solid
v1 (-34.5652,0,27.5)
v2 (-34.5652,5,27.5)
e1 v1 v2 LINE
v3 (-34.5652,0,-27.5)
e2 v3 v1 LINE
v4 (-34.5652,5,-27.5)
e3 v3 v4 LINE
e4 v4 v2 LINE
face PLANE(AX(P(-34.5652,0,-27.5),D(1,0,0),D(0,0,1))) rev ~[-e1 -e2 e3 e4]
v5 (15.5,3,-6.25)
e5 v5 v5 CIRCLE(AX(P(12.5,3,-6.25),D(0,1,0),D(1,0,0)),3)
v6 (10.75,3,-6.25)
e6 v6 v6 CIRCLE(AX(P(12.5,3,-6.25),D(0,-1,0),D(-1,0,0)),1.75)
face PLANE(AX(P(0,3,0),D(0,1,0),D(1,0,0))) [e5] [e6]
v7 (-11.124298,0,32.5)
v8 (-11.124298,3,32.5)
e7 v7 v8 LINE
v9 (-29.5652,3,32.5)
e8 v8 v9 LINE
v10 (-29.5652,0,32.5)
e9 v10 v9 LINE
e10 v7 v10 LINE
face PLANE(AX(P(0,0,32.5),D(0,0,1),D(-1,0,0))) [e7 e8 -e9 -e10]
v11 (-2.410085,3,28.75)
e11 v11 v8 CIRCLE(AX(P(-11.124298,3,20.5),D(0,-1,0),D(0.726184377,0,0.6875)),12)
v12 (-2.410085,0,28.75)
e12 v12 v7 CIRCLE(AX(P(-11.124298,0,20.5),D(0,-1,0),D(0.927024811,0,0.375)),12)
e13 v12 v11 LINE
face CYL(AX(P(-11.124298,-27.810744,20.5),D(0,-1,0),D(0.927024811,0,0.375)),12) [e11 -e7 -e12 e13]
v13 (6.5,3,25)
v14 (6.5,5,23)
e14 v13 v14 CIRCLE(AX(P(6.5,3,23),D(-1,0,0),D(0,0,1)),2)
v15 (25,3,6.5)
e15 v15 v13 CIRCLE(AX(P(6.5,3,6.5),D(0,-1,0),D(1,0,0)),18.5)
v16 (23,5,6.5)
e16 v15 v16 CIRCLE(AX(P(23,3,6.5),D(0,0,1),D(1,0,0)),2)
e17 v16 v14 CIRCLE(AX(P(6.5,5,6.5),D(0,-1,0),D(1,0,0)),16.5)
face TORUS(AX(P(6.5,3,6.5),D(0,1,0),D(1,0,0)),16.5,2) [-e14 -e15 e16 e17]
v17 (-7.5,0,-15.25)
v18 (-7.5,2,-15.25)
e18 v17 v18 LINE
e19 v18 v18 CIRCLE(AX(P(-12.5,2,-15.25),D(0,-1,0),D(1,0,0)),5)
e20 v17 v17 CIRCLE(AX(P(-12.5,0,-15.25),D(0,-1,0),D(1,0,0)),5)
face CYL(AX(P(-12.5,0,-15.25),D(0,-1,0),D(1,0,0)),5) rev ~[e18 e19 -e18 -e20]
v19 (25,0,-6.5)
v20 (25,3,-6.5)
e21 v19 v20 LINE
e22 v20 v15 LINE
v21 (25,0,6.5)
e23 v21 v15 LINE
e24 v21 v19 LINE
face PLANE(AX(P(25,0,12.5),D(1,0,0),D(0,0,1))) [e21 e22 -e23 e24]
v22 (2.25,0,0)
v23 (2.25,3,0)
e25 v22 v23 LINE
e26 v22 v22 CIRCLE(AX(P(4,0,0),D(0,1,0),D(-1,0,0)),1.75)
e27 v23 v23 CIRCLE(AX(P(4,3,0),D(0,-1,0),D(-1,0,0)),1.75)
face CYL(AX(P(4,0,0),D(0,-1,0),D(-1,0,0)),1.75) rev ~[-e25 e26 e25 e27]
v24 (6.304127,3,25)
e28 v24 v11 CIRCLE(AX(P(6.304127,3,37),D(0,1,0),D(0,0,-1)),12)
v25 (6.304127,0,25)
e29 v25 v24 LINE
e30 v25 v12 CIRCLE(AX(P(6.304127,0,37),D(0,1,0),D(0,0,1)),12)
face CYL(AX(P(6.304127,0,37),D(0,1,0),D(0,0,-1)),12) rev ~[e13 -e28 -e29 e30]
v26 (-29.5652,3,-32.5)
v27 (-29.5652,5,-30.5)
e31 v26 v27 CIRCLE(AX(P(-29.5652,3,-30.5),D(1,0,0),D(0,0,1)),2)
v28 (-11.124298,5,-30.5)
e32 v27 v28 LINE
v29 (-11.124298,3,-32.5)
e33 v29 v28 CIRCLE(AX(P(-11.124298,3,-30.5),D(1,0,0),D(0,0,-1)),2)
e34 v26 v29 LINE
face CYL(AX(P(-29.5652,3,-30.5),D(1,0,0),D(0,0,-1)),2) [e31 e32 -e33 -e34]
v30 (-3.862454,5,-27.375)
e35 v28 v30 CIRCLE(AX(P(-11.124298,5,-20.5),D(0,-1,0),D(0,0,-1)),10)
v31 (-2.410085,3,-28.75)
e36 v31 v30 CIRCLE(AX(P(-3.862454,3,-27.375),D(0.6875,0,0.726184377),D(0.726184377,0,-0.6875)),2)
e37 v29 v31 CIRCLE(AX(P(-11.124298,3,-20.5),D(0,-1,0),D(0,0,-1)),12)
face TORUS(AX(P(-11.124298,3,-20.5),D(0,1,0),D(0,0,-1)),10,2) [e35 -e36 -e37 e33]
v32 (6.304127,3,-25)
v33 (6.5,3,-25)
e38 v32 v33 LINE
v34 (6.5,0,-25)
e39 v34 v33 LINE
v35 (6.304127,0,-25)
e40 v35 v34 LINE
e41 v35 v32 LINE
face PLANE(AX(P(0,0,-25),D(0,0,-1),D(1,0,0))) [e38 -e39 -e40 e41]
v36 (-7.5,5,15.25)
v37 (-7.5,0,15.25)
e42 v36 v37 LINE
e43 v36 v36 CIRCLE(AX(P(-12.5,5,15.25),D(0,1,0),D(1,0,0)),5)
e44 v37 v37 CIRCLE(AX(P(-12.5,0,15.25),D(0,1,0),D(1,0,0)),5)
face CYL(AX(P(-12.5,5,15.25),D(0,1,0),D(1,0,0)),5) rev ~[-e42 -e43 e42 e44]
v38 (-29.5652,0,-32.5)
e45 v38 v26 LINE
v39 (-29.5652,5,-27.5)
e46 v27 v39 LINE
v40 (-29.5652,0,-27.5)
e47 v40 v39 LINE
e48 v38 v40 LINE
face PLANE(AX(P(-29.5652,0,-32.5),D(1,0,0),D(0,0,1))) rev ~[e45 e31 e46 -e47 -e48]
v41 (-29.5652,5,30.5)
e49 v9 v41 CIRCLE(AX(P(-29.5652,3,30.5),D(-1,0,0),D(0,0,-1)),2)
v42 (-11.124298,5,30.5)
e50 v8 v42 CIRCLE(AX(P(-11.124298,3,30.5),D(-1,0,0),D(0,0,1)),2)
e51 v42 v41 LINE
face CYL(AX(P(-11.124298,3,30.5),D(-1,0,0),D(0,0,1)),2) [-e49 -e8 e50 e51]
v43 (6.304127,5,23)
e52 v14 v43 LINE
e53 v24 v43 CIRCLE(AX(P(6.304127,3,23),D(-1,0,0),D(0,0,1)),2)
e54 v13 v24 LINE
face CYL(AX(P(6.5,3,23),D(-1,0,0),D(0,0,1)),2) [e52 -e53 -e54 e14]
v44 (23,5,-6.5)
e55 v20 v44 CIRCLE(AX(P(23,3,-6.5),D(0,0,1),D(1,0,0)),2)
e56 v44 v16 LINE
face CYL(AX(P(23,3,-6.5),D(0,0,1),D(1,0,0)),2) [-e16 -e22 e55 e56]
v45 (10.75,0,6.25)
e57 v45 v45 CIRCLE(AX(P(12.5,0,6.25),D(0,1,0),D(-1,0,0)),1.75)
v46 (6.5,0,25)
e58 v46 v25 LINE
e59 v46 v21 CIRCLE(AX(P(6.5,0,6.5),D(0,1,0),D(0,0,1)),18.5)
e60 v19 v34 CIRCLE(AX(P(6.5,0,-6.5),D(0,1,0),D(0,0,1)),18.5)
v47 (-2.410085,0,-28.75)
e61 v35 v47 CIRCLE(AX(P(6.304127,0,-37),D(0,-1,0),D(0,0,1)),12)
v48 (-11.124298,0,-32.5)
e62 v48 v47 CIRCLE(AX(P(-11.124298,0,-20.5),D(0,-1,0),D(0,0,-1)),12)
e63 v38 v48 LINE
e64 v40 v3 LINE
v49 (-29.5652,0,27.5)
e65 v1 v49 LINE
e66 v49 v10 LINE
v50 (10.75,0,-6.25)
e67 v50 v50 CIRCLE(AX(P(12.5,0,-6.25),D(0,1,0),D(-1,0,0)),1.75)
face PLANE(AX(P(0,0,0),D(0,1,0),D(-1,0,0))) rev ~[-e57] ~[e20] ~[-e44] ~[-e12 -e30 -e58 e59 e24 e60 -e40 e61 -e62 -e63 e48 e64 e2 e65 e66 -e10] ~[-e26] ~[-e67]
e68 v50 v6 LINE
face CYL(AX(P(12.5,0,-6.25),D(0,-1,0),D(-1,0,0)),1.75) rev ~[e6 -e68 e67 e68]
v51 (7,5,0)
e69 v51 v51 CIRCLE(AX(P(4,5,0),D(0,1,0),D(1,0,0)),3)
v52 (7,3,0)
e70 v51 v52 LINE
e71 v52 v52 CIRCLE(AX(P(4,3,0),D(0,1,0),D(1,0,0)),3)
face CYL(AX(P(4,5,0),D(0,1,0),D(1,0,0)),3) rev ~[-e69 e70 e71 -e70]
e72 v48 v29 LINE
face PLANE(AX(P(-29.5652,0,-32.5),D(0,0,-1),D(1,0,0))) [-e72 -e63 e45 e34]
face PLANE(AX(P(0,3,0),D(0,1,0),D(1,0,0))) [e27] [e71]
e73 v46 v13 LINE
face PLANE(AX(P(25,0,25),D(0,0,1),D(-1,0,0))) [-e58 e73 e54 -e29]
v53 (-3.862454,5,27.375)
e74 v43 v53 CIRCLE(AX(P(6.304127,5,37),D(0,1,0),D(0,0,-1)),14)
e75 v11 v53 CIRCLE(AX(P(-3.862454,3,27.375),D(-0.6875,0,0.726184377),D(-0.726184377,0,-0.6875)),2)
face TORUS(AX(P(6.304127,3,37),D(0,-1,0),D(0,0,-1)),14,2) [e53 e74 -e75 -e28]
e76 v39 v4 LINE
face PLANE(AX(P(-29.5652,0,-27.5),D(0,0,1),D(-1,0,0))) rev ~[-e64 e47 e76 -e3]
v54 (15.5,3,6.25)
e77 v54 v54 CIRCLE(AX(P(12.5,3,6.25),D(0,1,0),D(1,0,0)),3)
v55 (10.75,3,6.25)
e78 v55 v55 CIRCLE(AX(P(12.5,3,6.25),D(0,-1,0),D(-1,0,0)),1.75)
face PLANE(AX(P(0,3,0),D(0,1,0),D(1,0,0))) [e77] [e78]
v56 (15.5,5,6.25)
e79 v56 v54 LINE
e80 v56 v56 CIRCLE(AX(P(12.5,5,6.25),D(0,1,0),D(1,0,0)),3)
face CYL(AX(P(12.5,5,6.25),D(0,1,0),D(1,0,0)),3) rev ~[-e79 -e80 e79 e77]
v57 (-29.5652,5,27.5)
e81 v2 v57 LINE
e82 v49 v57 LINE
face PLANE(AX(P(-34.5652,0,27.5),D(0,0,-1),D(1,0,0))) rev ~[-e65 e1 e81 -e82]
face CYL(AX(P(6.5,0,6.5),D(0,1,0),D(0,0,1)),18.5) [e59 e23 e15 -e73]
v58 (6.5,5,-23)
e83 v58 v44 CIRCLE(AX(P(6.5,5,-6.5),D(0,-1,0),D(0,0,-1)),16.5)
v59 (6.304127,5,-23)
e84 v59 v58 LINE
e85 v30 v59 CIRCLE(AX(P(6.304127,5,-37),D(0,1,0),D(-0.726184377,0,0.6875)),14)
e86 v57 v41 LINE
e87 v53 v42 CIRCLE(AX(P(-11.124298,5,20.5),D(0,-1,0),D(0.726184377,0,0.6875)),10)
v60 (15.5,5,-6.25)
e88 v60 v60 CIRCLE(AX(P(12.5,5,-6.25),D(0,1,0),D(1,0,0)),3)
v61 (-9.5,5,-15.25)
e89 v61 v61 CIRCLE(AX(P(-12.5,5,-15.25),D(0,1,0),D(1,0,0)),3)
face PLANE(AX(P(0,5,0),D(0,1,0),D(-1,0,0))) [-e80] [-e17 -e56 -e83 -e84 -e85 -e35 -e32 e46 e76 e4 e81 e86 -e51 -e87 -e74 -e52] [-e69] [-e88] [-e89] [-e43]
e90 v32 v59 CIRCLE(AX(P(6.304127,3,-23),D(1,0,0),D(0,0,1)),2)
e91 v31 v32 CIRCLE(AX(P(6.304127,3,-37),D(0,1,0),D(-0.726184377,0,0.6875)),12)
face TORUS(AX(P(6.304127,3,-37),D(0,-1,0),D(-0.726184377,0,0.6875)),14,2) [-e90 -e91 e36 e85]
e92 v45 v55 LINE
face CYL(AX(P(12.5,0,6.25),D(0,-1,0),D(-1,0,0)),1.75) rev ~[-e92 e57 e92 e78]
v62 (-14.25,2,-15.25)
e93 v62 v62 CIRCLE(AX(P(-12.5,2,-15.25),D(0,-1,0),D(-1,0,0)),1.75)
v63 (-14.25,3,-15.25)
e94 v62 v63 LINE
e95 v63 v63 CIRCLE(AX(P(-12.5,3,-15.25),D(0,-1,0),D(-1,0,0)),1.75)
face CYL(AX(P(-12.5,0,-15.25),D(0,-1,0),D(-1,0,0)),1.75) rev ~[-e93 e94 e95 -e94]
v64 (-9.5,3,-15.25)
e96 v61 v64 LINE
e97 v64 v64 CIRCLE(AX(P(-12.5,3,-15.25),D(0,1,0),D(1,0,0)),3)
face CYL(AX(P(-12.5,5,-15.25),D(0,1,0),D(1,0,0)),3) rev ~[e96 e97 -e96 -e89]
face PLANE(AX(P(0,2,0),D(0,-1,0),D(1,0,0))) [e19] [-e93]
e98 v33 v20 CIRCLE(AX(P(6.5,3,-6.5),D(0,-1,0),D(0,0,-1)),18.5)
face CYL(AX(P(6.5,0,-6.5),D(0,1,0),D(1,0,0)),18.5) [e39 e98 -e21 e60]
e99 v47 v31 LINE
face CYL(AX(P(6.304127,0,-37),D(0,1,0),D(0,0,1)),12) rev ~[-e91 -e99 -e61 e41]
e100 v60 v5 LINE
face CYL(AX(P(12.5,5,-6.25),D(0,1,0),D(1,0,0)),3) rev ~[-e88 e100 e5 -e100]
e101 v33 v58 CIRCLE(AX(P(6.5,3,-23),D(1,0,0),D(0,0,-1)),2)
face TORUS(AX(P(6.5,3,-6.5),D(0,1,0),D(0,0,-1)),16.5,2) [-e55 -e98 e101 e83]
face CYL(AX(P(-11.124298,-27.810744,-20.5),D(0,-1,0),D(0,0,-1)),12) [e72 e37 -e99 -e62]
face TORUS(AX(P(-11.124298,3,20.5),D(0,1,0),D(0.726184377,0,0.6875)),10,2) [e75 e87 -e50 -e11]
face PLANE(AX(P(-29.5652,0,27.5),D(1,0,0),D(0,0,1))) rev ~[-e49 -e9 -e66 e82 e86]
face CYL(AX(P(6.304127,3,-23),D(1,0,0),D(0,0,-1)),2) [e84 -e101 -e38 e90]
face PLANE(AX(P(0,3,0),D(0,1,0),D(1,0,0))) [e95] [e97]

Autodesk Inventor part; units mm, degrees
ref_plane "YZ Plane" through (0, 0, 0) normal (1, 0, 0) x (0, 1, 0)
ref_plane "XZ Plane" through (0, 0, 0) normal (0, 1, 0) x (-1, 0, 0)
ref_plane "XY Plane" through (0, 0, 0) normal (0, 0, 1) x (1, 0, 0)
sketch "Sketch1" plane through (0, 0, 0) normal (0, 1, 0) x (-1, 0, 0)
  line L0 (-25, 25) -> (25, 25)
  line L1 (25, 25) -> (25, -25)
  line L2 (25, -25) -> (-25, -25)
  line L3 (-25, -25) -> (-25, 25)
  line L4 (-25, 25) -> (25, -25) construction
  line L5 (25, 25) -> (-25, -25) construction
  line L6 (25, 0) -> (-25, 0)
  circle A0 centre (12.5, 15.25) radius 1.75
  line L7 (-25, 12.5) -> (0, 12.5)
  line L8 (-12.5, 12.5) -> (-12.5, 0)
  circle A1 centre (-12.5, 6.25) radius 1.75
  line L9 (25, -25) -> (-25, 25) construction
  circle A2 centre (12.5, -15.25) radius 1.75
  circle A3 centre (-12.5, -6.25) radius 1.75
  line L10 (0, 32.5) -> (50, 32.5)
  line L11 (50, 32.5) -> (50, -32.5)
  line L12 (50, -32.5) -> (0, -32.5)
  line L13 (0, -32.5) -> (0, 32.5)
  line L14 (0, 32.5) -> (50, -32.5) construction
  line L15 (50, 32.5) -> (0, -32.5) construction
  line L16 (50, -32.5) -> (29.5652, -32.5)
  line L17 (29.5652, -32.5) -> (29.5652, 32.5)
  line L18 (29.5652, 32.5) -> (50, 32.5)
  line L19 (0, 32.5205) -> (0, -32.5)
  circle A4 centre (12.5, -15.25) radius 15
  line L20 (29.5652, -32.5) -> (39.5652, -32.5)
  line L21 (39.5652, -32.5) -> (39.5652, 32.5)
  line L22 (39.5652, 32.5) -> (29.5652, 32.5)
  line L23 (29.5652, 32.5) -> (29.5652, -32.5)
  line L24 (12.5, -15.25) -> (12.5, 0)
  line L25 (-12.5, -6.25) -> (12.5, -6.25)
  circle A5 centre (-4, 0) radius 5
  circle A6 centre (-4, 0) radius 1.75
  line L26 (0, 0) -> (-4, 0)
  line L27 (29.5652, -32.5) -> (29.5652, -27.5)
  line L28 (29.5652, -27.5) -> (34.5652, -27.5)
  line L29 (34.5652, -27.5) -> (34.5652, 27.5)
  line L30 (34.5652, 27.5) -> (29.5652, 27.5)
  line L31 (29.5652, 27.5) -> (29.5652, -27.5)
  point P0 (0, -12.5)
  point P1 (-12.5, -12.5)
  point P2 (0, 25)
  point P3 (0, -25)
  point P4 (0, 25)
  point P5 (0, -25)
  point P6 (0, 32.5)
  point P7 (0, 32.5)
  point P8 (0, -23.5416)
  point P9 (1.101, -25)
  point P10 (25, -23.5416)
  point P11 (23.899, -25)
  point P12 (39.5652, 32.5)
  point P13 (0, 0)
  dimension "d0" = 50
  dimension "d1" = 50
  dimension "d5" = 3.5
  dimension "d7" = 3.5
  dimension "d11" = 15.25
  dimension "d12" = 50
  dimension "d13" = 65
  dimension "d19" = 30
  dimension "d21" = 10
  dimension "d27" = 7.5
  dimension "d28" = 7.5
  dimension "d31" = 9
  dimension "d32" = 25
  dimension "d57" = 10
  dimension "d58" = 3.5
  dimension "d59" = 4
  dimension "d60" = 5
  dimension "d61" = 55
extrude "Extrusion3" add sketch "Sketch1" along normal blind 5 contours L0 L13 L7 L3 | L13 L10 L17 L12 L2 A4 L1 L0 | L0 L1 L6 A5 L13 | L7 L8 A1 L6 L3 | L13 A5 L6 L8 A1 L7 | L6 A5 L13 A4 L2 L3 | L1 A4 L24 L6 | A5 L6 L13 | L13 L6 A6 A5 | A4 L1 | L1 A4 L2 L13 L25 L24 | L24 A4 L25 L13 A5 L6 | L13 A5 L6 A6 | L6 A5 L13 | L30 L29 L28 L17 | L13 A4 L2 | L1 L2 A4 | L24 L25 A4 | L2 A4 | A4 L13 | A4 L13 L25 | A0
fillet "Fillet5" radius 12 2 edges at (0, 2.5, 32.5) (0, 2.5, -32.5)
fillet "Fillet6" radius 12 2 edges at (0, 2.5, 25) (0, 2.5, -25)
fillet "Fillet7" radius 18.5 2 edges at (25, 2.5, 25) (25, 2.5, -25)
sketch "Sketch5" plane through (0, 5, 0) normal (0, 1, 0) x (1, 0, 0)
  circle A0 centre (-12.5, 15.25) radius 1.75 projected
  circle A1 centre (-12.5, -15.25) radius 1.5 projected
  circle A2 centre (-12.5, -15.25) radius 5
  circle A3 centre (4, 0) radius 1.75 projected
  circle A4 centre (4, 0) radius 3
  circle A5 centre (12.5, 6.25) radius 1.75 projected
  circle A6 centre (12.5, 6.25) radius 3
  circle A7 centre (12.5, -6.25) radius 1.75 projected
  circle A8 centre (12.5, -6.25) radius 3
  circle A9 centre (-12.5, 15.25) radius 3
  point P0 (0, 0)
  dimension "d63" = 6
  dimension "d64" = 6
  dimension "d65" = 6
  dimension "d71" = 10
  dimension "d75" = 6
extrude "Extrusion8" cut sketch "Sketch5" against normal blind 2 contours A3 | A4 | A5 | A6 | A7 | A8
fillet "Fillet9" radius 2 11 edges at (6.4021, 5, 25) (1.5607, 5, 25.9773) (-6.3809, 5, 31.5227) (-20.3448, 5, 32.5) (25, 5, 0) (19.5815, 5, -19.5815) (6.4021, 5, -25) (1.5607, 5, -25.9773) (-6.3809, 5, -31.5227) (-20.3448, 5, -32.5) (19.5815, 5, 19.5815)
extrude "Extrusion9" cut sketch "Sketch5" against normal through all contours A1 | A2
sketch "Sketch6" plane through (0, 0, 0) normal (0, -1, 0) x (1, 0, 0)
  circle A0 centre (-12.5, -15.25) radius 1.75 projected
  circle A1 centre (-12.5, -15.25) radius 5
  point P0 (0, 0)
  dimension "d72" = 10
extrude "Extrusion10" cut sketch "Sketch6" against normal blind 2
extrude "Extrusion11" cut sketch "Sketch5" against normal blind 2 contours A0 | A9
sketch "Sketch7" plane through (0, 0, 0) normal (0, -1, 0) x (1, 0, 0)
  circle A0 centre (-12.5, 15.25) radius 5 projected
  circle A1 centre (-12.5, -15.25) radius 5 projected
  point P0 (0, 0)
  point P1 (-12.5, 20.25)
  point P2 (-12.5, -20.25)
properties part number "Top"
